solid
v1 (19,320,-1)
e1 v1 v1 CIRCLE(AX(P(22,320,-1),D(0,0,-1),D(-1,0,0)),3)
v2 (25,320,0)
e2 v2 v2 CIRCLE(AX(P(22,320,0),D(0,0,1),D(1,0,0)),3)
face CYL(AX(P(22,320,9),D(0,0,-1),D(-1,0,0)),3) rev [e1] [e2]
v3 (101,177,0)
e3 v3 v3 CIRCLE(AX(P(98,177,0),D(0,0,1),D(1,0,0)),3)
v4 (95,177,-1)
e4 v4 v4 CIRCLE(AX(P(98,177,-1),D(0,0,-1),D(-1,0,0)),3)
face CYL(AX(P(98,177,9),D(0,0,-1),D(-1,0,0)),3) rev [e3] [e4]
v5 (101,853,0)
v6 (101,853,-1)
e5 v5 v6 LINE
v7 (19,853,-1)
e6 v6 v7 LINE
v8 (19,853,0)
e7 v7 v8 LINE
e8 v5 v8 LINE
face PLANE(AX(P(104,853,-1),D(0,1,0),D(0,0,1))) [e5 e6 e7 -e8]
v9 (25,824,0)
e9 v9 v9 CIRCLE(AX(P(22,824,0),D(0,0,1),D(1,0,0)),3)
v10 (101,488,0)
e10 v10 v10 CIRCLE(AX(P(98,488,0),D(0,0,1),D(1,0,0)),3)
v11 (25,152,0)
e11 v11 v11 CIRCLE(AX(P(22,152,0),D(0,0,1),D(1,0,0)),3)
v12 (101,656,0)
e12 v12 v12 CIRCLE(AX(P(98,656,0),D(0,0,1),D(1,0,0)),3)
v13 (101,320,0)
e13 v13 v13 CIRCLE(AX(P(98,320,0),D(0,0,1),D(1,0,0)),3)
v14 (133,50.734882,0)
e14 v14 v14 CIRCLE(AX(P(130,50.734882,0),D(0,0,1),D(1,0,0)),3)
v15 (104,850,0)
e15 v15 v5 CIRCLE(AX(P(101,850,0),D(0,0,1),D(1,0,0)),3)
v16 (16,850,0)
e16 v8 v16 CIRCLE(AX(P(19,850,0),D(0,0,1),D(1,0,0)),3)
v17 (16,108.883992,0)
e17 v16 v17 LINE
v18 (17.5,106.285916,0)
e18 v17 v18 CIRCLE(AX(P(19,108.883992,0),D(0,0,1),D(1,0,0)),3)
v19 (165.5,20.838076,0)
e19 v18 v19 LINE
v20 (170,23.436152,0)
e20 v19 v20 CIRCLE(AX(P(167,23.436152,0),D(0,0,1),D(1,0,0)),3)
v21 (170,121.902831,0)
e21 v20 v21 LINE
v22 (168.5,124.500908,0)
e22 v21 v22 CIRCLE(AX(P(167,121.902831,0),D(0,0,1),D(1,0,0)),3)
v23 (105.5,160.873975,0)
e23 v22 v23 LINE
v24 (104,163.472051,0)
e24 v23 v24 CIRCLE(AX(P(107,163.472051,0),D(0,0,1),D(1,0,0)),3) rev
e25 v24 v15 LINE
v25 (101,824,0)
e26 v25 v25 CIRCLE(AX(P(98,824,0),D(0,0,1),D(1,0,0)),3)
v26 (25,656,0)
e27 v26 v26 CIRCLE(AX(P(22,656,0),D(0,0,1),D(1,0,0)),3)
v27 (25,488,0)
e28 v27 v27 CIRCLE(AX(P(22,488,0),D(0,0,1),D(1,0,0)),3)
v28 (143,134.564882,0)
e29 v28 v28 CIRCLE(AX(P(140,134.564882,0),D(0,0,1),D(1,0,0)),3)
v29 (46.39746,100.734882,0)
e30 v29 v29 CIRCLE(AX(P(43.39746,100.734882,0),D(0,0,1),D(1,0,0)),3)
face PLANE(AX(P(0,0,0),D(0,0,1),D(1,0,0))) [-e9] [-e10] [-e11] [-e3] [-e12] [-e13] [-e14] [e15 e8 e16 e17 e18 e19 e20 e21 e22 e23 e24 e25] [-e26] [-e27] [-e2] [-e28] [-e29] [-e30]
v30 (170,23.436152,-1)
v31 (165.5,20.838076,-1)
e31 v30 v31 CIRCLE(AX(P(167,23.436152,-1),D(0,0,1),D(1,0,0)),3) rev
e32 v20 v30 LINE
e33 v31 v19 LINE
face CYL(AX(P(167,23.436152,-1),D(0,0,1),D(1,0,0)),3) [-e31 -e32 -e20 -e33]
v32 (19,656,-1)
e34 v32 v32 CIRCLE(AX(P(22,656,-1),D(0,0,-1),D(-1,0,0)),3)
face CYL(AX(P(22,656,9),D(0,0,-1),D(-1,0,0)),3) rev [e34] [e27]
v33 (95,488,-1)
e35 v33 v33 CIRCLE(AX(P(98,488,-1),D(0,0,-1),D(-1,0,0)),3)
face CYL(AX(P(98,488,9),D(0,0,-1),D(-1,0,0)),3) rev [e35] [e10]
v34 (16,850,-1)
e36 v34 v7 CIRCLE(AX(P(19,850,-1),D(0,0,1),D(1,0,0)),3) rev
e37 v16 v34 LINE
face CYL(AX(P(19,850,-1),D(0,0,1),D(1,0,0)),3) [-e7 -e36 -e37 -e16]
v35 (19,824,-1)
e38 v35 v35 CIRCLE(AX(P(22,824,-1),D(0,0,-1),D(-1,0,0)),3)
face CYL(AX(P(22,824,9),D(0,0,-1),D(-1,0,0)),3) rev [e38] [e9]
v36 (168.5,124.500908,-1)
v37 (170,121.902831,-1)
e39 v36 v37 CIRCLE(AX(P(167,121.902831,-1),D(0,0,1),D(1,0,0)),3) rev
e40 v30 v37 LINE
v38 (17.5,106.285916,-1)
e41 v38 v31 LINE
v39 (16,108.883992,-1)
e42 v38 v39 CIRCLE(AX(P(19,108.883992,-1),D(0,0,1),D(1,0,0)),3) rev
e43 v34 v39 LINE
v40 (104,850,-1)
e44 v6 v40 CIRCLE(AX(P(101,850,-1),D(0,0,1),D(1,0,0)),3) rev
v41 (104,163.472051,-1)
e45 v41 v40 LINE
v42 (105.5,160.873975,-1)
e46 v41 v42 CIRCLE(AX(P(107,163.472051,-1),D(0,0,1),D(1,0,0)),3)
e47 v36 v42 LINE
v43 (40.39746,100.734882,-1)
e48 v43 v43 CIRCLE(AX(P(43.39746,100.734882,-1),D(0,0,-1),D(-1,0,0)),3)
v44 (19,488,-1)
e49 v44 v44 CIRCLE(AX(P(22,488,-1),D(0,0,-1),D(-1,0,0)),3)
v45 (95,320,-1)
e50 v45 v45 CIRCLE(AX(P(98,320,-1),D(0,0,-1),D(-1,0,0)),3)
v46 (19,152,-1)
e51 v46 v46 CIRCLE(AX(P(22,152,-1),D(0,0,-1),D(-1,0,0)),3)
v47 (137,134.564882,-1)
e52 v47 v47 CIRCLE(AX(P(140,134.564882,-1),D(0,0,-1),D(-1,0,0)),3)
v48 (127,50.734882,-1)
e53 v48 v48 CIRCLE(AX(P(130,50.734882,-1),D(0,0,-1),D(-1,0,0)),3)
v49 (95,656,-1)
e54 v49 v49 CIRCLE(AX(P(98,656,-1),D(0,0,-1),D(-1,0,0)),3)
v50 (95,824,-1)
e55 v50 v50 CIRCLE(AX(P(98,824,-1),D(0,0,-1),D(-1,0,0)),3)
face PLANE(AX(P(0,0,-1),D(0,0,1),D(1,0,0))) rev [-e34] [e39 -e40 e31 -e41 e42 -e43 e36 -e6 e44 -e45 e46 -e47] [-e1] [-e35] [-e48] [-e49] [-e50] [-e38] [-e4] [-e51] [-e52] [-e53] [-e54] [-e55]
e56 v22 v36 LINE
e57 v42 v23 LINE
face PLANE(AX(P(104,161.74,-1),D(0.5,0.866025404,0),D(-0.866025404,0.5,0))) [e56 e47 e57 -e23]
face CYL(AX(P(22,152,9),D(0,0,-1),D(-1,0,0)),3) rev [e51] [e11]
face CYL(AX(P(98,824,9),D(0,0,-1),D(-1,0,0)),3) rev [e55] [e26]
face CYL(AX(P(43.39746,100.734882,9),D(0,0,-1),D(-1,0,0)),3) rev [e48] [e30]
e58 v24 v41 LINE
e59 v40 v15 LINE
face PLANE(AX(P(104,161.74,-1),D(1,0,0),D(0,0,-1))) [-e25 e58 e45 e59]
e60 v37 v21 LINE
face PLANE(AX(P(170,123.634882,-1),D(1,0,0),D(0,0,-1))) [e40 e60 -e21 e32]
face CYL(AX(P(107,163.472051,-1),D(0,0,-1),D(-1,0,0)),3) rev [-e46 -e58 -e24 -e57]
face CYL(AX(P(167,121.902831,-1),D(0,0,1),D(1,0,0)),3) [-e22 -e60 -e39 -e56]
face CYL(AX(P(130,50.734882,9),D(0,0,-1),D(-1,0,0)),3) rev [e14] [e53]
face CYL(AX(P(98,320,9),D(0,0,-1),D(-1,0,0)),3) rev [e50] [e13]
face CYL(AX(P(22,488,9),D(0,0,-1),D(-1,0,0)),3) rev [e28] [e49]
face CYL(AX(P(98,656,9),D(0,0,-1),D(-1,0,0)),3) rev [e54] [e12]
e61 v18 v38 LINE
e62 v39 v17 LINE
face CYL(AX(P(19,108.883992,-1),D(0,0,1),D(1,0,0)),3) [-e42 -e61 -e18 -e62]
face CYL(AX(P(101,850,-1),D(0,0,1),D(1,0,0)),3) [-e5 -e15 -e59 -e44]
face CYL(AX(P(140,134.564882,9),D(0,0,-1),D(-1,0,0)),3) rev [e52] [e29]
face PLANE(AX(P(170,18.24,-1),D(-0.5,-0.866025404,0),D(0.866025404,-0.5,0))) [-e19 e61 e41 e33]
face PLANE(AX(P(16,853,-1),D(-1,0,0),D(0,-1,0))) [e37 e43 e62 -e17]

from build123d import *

# Parameters (mm, degrees)
BASE_FLANGE1_DEPTH = 1
SKETCH2_R          = 3
CUT_EXTRUDE1_DEPTH = 10
FILLET1_R          = 3


# Sheet-metal steps are written as plain solids
with BuildPart() as part:
    # Sketch1 → Base-Flange1 (new body)
    with BuildSketch(Plane.XY):
        Polygon((104, 853), (16, 853), (16, 107.151941455), (170, 18.24), (170, 123.634882233), (104, 161.74), align=None)
    extrude(amount=-BASE_FLANGE1_DEPTH)

    # Sketch2 → Cut-Extrude1 (cut)
    with BuildSketch(Plane(origin=(0, 0, -1), x_dir=(-1, 0, 0), z_dir=(0, 0, -1))):
        with Locations((-22, 824)):
            Circle(SKETCH2_R)
        with Locations((-98, 824)):
            Circle(SKETCH2_R)
        with Locations((-98, 656)):
            Circle(SKETCH2_R)
        with Locations((-98, 488)):
            Circle(SKETCH2_R)
        with Locations((-98, 320)):
            Circle(SKETCH2_R)
        with Locations((-22, 656)):
            Circle(SKETCH2_R)
        with Locations((-22, 488)):
            Circle(SKETCH2_R)
        with Locations((-22, 320)):
            Circle(SKETCH2_R)
        with Locations((-22, 152)):
            Circle(SKETCH2_R)
        with Locations((-98, 177)):
            Circle(SKETCH2_R)
        with Locations((-140, 134.564882233)):
            Circle(SKETCH2_R)
        with Locations((-130, 50.734882233)):
            Circle(SKETCH2_R)
        with Locations((-43.397459622, 100.734882233)):
            Circle(SKETCH2_R)
    extrude(amount=-CUT_EXTRUDE1_DEPTH, mode=Mode.SUBTRACT)

    # Fillet1
    fillet1_edges = [part.edges().sort_by_distance(p)[0] for p in [
        (104, 161.74, -0.5),
        (170, 123.634882233, -0.5),
        (170, 18.24, -0.5),
        (16, 107.151941455, -0.5),
        (16, 853, -0.5),
        (104, 853, -0.5),
    ]]
    fillet(fillet1_edges, radius=FILLET1_R)


solid = part.part
